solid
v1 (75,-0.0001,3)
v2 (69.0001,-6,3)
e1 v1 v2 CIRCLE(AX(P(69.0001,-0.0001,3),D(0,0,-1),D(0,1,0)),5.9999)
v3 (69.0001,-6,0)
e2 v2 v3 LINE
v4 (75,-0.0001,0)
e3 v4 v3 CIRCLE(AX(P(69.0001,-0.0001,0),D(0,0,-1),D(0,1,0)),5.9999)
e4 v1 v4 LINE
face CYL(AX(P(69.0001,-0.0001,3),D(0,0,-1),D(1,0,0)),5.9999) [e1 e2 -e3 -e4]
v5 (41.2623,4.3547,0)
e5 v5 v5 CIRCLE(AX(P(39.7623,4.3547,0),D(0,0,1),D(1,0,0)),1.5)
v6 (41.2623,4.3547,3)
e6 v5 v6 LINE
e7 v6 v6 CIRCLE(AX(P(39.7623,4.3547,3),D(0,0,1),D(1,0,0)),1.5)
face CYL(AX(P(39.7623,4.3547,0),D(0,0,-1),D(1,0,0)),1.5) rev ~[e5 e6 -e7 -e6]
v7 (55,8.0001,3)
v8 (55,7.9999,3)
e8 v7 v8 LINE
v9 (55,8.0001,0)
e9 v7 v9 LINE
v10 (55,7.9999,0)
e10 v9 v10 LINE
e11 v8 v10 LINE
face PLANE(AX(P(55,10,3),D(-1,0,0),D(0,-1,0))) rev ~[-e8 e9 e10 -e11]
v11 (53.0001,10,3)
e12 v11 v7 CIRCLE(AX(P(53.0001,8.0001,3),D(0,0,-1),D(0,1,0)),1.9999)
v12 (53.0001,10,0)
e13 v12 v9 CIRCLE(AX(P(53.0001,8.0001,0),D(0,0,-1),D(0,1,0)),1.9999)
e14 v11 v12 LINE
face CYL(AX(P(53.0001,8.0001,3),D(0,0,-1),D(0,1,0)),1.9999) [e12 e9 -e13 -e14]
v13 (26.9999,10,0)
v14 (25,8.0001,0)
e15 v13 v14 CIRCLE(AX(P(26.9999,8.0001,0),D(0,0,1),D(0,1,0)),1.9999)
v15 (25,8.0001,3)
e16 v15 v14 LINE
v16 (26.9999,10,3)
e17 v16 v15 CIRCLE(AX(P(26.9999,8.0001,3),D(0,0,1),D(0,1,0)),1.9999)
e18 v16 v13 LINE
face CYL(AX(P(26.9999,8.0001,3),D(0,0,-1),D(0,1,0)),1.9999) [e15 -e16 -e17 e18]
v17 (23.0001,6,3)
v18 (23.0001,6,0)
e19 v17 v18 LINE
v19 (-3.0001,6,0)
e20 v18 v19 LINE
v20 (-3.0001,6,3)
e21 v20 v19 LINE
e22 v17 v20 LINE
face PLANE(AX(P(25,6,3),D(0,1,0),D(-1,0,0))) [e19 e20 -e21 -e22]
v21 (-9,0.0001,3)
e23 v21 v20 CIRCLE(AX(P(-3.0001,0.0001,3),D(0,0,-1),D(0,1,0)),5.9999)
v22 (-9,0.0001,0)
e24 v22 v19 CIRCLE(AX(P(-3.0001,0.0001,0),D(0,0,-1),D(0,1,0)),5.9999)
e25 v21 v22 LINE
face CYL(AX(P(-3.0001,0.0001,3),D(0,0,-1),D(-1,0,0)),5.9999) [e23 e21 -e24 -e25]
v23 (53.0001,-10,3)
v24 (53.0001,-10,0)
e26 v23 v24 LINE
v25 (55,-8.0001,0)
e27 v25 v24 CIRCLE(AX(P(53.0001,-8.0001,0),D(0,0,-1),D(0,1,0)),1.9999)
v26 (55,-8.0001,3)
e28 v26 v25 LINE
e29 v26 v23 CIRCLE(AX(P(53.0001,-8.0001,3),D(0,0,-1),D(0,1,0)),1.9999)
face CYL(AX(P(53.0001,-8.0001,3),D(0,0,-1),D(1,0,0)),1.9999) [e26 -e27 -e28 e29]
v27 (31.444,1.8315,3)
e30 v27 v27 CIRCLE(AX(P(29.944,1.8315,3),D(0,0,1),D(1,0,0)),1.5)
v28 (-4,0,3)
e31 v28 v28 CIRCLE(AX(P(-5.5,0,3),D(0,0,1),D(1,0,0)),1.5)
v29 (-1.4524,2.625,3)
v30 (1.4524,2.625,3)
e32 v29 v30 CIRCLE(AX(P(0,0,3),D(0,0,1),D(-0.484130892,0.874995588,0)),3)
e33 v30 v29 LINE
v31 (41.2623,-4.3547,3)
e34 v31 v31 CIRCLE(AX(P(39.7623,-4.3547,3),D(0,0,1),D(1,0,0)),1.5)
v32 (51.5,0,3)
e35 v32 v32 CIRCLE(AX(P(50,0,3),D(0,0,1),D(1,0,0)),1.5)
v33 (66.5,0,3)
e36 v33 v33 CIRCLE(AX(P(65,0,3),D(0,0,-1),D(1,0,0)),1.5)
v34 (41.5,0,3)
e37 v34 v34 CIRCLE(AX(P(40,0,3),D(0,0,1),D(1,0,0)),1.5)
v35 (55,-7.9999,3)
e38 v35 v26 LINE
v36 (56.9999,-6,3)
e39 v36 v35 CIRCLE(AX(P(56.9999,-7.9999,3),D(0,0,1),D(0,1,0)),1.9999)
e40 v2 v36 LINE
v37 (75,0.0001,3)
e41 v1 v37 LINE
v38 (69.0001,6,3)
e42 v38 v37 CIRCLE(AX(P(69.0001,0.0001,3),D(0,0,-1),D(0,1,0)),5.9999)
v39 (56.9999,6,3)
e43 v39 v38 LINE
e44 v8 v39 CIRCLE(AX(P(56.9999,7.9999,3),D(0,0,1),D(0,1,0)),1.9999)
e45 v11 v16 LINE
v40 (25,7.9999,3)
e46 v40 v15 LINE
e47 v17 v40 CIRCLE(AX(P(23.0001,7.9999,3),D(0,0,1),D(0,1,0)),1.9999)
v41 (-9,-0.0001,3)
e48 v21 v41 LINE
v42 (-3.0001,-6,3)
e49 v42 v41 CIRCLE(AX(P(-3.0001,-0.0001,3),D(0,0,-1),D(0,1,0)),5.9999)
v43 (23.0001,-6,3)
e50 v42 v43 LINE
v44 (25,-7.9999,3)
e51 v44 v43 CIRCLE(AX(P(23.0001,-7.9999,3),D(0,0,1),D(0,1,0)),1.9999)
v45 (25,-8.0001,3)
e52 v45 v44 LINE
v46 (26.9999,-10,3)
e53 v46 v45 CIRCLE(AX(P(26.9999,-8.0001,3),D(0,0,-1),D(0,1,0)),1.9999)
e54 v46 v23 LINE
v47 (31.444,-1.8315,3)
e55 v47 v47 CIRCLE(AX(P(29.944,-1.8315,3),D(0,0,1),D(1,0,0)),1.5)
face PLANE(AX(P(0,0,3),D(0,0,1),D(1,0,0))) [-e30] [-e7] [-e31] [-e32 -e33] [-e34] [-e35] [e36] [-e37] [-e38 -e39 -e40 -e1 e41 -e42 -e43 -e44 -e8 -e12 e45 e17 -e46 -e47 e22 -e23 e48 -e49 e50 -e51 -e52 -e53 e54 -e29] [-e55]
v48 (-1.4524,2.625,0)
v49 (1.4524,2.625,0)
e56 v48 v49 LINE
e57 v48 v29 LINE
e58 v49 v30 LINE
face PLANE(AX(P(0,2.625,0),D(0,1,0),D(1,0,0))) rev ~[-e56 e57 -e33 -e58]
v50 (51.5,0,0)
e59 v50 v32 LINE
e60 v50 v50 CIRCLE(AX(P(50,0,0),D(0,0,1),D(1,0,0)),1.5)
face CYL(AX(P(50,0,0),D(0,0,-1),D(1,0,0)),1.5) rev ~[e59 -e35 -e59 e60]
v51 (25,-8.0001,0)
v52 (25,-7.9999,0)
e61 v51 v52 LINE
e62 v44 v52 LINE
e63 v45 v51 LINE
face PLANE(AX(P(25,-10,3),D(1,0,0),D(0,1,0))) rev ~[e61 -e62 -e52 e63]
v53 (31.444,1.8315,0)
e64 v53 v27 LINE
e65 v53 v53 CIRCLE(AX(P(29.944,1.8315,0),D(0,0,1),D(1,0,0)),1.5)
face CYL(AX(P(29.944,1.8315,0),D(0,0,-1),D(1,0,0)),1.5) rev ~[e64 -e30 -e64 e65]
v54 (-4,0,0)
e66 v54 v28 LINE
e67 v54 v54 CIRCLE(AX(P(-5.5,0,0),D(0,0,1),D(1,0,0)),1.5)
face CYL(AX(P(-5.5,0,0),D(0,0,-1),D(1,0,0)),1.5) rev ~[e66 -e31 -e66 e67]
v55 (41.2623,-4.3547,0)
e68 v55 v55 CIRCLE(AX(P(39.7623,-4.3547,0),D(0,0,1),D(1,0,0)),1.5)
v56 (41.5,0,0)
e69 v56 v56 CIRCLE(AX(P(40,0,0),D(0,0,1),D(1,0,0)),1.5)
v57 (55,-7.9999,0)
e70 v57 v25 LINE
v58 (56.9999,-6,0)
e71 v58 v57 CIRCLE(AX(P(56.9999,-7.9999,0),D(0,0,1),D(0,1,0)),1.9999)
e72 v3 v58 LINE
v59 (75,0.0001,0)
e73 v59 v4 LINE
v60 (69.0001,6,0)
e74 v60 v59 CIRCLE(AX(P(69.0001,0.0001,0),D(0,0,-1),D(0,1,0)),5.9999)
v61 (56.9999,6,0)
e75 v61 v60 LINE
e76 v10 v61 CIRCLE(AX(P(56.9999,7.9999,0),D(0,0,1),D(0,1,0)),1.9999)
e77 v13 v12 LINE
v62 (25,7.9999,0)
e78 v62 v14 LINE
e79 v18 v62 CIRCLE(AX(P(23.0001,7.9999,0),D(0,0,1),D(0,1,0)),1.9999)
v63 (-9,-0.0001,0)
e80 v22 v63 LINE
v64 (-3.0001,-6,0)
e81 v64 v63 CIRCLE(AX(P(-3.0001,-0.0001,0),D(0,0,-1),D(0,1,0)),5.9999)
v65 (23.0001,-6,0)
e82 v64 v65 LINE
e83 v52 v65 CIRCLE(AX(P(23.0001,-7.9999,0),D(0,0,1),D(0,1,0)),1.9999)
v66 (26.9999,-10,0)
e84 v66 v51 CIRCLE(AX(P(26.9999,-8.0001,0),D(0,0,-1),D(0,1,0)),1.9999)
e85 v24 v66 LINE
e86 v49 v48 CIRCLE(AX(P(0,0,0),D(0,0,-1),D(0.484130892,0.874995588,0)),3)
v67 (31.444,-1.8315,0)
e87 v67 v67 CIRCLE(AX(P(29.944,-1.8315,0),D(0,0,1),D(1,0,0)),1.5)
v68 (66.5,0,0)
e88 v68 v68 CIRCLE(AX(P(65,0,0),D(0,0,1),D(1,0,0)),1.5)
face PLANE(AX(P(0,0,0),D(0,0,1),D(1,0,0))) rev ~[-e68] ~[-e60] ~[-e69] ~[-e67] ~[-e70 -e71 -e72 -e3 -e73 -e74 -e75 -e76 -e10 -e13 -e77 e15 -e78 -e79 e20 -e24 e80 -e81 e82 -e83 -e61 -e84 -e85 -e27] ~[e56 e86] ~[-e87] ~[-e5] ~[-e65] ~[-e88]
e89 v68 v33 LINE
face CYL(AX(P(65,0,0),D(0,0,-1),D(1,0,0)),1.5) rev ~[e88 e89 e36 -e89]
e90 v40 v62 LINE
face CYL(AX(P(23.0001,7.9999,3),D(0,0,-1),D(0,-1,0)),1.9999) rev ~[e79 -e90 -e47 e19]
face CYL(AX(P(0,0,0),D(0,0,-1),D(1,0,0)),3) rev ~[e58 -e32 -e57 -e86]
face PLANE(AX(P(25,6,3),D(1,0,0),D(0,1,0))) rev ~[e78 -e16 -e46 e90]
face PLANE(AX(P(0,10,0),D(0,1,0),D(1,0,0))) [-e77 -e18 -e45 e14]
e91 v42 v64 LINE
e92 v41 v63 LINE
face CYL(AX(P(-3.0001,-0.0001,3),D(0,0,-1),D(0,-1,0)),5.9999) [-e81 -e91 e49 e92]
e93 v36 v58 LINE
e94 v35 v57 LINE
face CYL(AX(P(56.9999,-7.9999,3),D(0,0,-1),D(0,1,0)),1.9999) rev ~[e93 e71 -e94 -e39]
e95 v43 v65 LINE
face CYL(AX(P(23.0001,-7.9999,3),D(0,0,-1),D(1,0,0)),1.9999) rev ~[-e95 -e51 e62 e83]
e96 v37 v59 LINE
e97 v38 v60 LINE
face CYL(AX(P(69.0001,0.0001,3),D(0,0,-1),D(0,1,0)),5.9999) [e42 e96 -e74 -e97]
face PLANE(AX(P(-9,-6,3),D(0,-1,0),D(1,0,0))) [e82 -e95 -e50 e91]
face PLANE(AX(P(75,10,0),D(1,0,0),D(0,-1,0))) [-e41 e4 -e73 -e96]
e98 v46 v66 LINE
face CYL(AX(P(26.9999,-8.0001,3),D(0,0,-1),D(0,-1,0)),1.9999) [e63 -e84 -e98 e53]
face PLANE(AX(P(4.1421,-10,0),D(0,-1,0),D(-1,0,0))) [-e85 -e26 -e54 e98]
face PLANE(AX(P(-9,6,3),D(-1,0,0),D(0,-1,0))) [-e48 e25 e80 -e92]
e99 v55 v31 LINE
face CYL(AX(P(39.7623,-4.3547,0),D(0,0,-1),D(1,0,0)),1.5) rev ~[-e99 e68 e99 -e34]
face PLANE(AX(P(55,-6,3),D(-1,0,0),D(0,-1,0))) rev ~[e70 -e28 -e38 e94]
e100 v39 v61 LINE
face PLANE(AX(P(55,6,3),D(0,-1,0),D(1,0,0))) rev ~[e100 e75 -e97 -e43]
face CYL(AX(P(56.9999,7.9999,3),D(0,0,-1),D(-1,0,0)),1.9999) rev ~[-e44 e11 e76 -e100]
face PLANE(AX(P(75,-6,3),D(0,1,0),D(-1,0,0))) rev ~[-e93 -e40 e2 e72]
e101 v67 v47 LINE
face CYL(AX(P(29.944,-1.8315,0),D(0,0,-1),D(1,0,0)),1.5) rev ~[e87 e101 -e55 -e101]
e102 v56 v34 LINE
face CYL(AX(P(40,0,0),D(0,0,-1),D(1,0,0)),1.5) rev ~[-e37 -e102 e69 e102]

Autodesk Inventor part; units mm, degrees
ref_plane "YZ Plane" through (0, 0, 0) normal (1, 0, 0) x (0, 1, 0)
ref_plane "XZ Plane" through (0, 0, 0) normal (0, 1, 0) x (-1, 0, 0)
ref_plane "XY Plane" through (0, 0, 0) normal (0, 0, 1) x (1, 0, 0)
sketch "Sketch1" plane through (0, 0, 0) normal (0, 0, 1) x (1, 0, 0)
  circle A0 centre (0, 0) radius 3
  line L0 (-1.4524, 2.625) -> (1.4524, 2.625)
  line L1 (-4.1421, -10) -> (-10, -4.1421)
  line L2 (-10, -4.1421) -> (-10, 4.1421)
  line L3 (-10, 4.1421) -> (-4.1421, 10)
  line L4 (-4.1421, 10) -> (4.1421, 10)
  line L5 (4.1421, 10) -> (10, 4.1421)
  line L6 (10, 4.1421) -> (10, -4.1421)
  line L7 (10, -4.1421) -> (4.1421, -10)
  line L8 (4.1421, -10) -> (-4.1421, -10)
  circle A1 centre (29.944, -1.8315) radius 1.5
  circle A2 centre (29.944, 1.8315) radius 1.5
  circle A3 centre (0, 0) radius 30 construction
  line L9 (0, 0) -> (30, 0) construction
  line L10 (0, 0) -> (29.944, 1.8315) construction
  line L11 (0, 0) -> (29.944, -1.8315) construction
  circle A4 centre (0, 0) radius 40 construction
  circle A5 centre (39.7623, 4.3547) radius 1.5
  circle A6 centre (40, 0) radius 1.5
  circle A7 centre (39.7623, -4.3547) radius 1.5
  line L12 (0, 0) -> (39.7623, 4.3547) construction
  line L13 (40, 0) -> (0, 0) construction
  line L14 (0, 0) -> (39.7623, -4.3547) construction
  circle A8 centre (50, 0) radius 1.5
  circle A9 centre (65, 0) radius 1.5
  circle A10 centre (-5.5, 0) radius 1.5
  line L15 (0, 0) -> (65, 0) construction
  line L16 (0, -10) -> (65, -10)
  line L17 (65, 10) -> (0, 10)
  arc A11 (0, 10) -> (0, -10) centre (0, 0) ccw
  arc A12 (65, -10) -> (65, 10) centre (65, 0) ccw
  line L18 (0, 10) -> (-10, 10)
  line L19 (-10, 10) -> (-10, -10)
  line L20 (-10, -10) -> (0, -10)
  line L21 (0, -10) -> (0, 10)
  line L22 (65, 10) -> (75, 10)
  line L23 (75, 10) -> (75, -10)
  line L24 (75, -10) -> (65, -10)
  line L25 (65, -10) -> (65, 10)
  point P0 (32.5, 0)
  point P1 (4.1421, -10)
  point P2 (0, 10)
  point P3 (0, 0)
  point P4 (65, 0)
  point P5 (75, 0)
  point P6 (-10, 0)
  dimension "d0" = 6
  dimension "d1" = 2.625
  dimension "d2" = 20
  dimension "d3" = 3
  dimension "d4" = 3
  dimension "d5" = 60
  dimension "d6" = 3.5
  dimension "d7" = 3.5
  dimension "d8" = 80
  dimension "d9" = 3
  dimension "d10" = 3
  dimension "d11" = 3
  dimension "d12" = 0
  dimension "d13" = 6.25
  dimension "d14" = 6.25
  dimension "d15" = 3
  dimension "d16" = 3
  dimension "d17" = 0
  dimension "d18" = 50
  dimension "d19" = 0
  dimension "d20" = 65
  dimension "d21" = 3
  dimension "d22" = 0
  dimension "d23" = 5.5
  dimension "d24" = 20
  dimension "d36" = 10
  dimension "d37" = 10
  dimension "d38" = 20
  dimension "d44" = 10
extrude "Extrusion1" add sketch "Sketch1" along normal blind 3 contours A0 L21 L4 L5 L6 L7 L8 | L0 L21 A0 | L21 A11 A0 | L21 L0 A0 | L8 L1 A11 | A11 L3 L4 | L7 L6 L5 L17 L25 A9 L16 | L20 L19 L1 | L1 L2 A11 | L3 L19 L18 | A11 L2 L3 | L25 A9 A12 | A12 L23 L24 | L22 L23 A12 picked at (0.8147, 2.6938) picked at (-0.8147, 2.6938)
sketch "Sketch2" plane through (0, 0, 3) normal (0, 0, 1) x (1, 0, 0)
  line L0 (75, 10) -> (-10, 10) projected
  line L1 (-10, -10) -> (75, -10) projected
  line L2 (25, 10) -> (55, 10)
  line L3 (55, 10) -> (55, -10)
  line L4 (55, -10) -> (25, -10)
  line L5 (25, -10) -> (25, 10)
  line L6 (25, 6) -> (-9, 6)
  line L7 (-9, 6) -> (-9, -6)
  line L8 (-9, -6) -> (25, -6)
  line L9 (25, -6) -> (25, 6)
  line L10 (55, 6) -> (75, 6)
  line L11 (75, 6) -> (75, -6)
  line L12 (75, -6) -> (55, -6)
  line L13 (55, -6) -> (55, 6)
  circle A0 centre (65, 0) radius 1.5 projected
  line L14 (75, 10) -> (-10, 10) projected
  line L15 (-10, 10) -> (-10, -10) projected
  line L16 (-10, -10) -> (75, -10) projected
  line L17 (75, -10) -> (75, 10) projected
  arc A1 (-1.4524, 2.625) -> (1.4524, 2.625) centre (0, 0) ccw projected
  circle A2 centre (29.944, -1.8315) radius 1.5 projected
  circle A3 centre (29.944, 1.8315) radius 1.5 projected
  circle A4 centre (39.7623, 4.3547) radius 1.5 projected
  circle A5 centre (40, 0) radius 1.5 projected
  circle A6 centre (39.7623, -4.3547) radius 1.5 projected
  circle A7 centre (50, 0) radius 1.5 projected
  circle A8 centre (65, 0) radius 1.5 projected
  line L18 (-1.4524, 2.625) -> (1.4524, 2.625) projected
  point P0 (-9, 0)
  point P1 (55, -6)
  point P2 (-10, -6)
  point P3 (-10, -10)
  point P4 (25, -6)
  point P5 (-10, 6)
  dimension "d28" = 6
  dimension "d29" = 6
  dimension "d30" = 9
  dimension "d31" = 6
  dimension "d32" = 10
  dimension "d33" = 6
  dimension "d34" = 10
  dimension "d39" = 25
extrude "Extrusion2" cut sketch "Sketch2" against normal up to surface (3 mm away) contours L17 L10 L3 L0 | L5 L6 L7 L8 L1 L15 L0 | L17 L1 L3 L12
fillet "Fillet1" radius 2 8 edges at (25, -6, 1.5) (25, -10, 1.5) (55, -10, 1.5) (55, -6, 1.5) (25, 10, 1.5) (25, 6, 1.5) (55, 10, 1.5) (55, 6, 1.5)
fillet "Fillet1" radius 6 4 edges at (75, 6, 1.5) (75, -6, 1.5) (-9, 6, 1.5) (-9, -6, 1.5)
equation "\"d7\" = d6"
equation "\"d14\" = d13"
equation "\"d29\" = d28"
equation "\"d31\" = d28"
equation "\"d33\" = d28"
properties part number "Arm1" material "Aluminum 6061, Welded"
